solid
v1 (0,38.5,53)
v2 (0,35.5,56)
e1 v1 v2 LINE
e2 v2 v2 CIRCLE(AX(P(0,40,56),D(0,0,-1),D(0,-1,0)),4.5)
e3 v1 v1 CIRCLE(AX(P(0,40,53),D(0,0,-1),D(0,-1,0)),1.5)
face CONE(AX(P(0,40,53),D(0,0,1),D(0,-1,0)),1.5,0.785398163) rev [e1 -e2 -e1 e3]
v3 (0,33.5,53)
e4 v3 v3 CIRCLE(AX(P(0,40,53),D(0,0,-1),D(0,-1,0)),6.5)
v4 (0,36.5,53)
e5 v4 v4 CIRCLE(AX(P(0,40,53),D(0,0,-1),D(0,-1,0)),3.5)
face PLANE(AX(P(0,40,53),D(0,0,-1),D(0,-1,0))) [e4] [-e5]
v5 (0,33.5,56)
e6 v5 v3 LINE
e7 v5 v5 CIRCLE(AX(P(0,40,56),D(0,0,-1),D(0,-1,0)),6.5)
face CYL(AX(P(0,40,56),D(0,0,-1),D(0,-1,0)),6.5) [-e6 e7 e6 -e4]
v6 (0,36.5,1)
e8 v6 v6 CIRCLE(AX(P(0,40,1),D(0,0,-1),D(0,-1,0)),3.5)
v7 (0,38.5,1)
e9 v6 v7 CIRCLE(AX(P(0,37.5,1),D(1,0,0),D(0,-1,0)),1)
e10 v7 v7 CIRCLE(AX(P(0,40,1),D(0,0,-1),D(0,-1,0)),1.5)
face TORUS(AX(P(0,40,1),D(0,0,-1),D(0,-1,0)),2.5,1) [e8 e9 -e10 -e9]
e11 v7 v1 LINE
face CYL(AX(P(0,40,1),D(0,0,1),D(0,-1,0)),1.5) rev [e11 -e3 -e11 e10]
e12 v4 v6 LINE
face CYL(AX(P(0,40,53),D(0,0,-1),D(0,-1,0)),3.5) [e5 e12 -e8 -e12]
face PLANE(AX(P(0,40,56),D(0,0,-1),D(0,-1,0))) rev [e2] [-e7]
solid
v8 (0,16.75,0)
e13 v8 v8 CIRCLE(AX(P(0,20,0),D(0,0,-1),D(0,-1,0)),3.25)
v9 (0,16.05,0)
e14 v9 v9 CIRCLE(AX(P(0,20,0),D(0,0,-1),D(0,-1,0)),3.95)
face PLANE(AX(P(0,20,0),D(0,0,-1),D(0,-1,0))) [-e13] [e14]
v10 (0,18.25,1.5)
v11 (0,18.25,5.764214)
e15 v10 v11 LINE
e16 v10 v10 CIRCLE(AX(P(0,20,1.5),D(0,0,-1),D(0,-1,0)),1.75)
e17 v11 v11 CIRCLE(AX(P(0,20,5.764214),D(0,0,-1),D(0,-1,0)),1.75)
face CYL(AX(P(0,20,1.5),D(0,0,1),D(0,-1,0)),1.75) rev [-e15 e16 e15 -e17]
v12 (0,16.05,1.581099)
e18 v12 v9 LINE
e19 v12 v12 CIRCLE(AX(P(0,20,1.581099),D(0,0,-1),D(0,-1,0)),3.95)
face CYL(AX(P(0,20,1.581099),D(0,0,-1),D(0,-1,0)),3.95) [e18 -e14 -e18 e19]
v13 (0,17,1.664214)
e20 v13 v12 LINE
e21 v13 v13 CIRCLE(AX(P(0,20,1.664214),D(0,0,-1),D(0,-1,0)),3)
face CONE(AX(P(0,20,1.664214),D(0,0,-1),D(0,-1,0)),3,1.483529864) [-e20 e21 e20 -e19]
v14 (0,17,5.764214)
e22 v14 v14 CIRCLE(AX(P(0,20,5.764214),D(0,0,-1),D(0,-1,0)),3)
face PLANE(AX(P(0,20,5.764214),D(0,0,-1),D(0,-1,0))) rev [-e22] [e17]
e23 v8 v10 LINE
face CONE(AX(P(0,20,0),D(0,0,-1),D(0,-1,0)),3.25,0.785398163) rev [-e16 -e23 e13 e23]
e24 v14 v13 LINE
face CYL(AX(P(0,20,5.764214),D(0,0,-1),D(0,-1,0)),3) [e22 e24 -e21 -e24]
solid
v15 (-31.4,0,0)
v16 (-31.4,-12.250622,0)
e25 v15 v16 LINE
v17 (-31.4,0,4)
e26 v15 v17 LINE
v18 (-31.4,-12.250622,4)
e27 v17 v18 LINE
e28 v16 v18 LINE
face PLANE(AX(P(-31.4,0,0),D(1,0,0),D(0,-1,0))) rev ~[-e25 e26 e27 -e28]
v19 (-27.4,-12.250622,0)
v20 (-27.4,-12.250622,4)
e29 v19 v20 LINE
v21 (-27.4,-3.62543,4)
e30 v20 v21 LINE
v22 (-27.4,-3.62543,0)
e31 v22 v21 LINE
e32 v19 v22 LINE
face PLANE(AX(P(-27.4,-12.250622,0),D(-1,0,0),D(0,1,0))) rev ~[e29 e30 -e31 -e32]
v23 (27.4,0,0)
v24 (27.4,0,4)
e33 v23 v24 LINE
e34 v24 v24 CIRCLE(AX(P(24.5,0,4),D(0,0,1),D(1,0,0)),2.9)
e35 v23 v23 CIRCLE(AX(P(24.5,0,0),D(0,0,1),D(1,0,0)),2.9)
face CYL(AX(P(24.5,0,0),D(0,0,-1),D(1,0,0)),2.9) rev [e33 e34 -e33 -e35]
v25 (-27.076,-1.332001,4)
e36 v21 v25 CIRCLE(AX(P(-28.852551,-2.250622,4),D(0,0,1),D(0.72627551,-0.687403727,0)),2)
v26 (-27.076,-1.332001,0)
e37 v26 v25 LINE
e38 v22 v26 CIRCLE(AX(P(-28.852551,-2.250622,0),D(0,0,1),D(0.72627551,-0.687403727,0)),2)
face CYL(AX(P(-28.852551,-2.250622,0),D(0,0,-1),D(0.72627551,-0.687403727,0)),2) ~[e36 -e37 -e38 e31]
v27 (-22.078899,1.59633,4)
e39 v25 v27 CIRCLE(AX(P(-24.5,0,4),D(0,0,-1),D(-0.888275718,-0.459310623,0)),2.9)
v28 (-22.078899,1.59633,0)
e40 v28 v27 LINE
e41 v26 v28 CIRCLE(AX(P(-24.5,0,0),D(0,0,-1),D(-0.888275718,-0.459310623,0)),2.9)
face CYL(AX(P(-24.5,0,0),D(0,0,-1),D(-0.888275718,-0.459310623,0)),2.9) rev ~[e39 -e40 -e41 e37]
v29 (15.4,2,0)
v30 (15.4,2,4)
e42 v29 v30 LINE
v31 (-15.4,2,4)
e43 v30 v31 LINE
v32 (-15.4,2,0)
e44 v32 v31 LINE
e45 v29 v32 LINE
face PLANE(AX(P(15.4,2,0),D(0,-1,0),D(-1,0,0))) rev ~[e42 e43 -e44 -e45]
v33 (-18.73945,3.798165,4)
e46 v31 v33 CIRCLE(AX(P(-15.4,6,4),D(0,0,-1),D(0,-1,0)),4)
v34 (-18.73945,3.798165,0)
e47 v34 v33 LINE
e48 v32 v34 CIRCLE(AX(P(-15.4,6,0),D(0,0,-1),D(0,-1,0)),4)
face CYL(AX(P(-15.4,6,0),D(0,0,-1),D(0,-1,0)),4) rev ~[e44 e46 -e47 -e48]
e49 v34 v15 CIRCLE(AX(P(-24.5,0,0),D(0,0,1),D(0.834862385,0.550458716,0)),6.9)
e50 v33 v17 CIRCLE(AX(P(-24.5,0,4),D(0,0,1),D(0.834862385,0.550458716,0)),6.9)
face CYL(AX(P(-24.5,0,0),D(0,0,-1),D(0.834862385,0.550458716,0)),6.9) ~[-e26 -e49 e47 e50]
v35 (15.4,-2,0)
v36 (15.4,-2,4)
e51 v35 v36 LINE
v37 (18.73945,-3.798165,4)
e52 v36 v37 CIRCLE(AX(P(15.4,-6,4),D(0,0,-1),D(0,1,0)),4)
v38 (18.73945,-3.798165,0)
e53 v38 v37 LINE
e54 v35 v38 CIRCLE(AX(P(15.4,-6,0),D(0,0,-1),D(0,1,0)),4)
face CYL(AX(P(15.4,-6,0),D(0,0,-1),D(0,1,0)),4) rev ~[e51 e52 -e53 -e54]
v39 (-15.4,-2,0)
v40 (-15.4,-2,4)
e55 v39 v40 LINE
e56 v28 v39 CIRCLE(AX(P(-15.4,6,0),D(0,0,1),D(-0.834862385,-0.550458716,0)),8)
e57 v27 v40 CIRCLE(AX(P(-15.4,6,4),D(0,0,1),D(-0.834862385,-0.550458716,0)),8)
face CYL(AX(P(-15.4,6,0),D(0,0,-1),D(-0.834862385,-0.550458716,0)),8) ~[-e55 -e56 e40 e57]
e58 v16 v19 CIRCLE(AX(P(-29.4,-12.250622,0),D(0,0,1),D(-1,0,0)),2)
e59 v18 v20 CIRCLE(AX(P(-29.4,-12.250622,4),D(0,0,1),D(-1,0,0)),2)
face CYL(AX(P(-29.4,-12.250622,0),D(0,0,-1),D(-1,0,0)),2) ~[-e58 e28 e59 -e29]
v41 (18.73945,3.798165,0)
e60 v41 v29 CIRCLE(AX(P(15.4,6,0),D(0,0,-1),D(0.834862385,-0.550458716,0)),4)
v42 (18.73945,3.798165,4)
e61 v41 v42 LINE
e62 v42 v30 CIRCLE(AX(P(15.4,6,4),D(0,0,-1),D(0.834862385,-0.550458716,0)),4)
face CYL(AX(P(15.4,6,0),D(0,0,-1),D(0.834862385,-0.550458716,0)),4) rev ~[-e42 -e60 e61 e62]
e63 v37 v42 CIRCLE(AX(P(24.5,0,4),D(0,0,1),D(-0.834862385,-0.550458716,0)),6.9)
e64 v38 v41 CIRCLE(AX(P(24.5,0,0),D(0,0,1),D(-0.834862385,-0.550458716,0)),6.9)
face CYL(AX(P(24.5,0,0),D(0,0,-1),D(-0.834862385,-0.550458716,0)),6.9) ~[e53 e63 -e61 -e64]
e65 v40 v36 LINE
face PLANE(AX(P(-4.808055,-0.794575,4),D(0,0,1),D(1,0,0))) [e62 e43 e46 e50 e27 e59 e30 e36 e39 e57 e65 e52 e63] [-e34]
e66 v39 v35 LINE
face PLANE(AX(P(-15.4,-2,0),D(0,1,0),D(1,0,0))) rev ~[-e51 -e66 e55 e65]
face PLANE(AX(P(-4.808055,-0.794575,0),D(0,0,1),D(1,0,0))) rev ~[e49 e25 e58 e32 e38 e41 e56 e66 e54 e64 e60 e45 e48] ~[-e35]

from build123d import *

# Parameters (mm, degrees)
F1_R     = 2.9
F2_DEPTH = 4


# Not quite as in the source:
# - a feature names something its author has since deleted; it is built from what else it names


with BuildPart() as f2:
    # F1 (on Top) → F2 (new body)
    with BuildSketch(Plane.XY):
        with BuildLine():
            Line((15.4, 2), (-15.4, 2))
            ThreePointArc((-15.4, 2), (-17.2963992921, 2.4781156003), (-18.7394495413, 3.7981651376))
            ThreePointArc((-18.7394495413, 3.7981651376), (-26.4827004104, 6.609001368), (-31.4, 0))
            Line((-31.4, 0), (-31.4, -12.2506220506))
            ThreePointArc((-31.4, -12.2506220506), (-29.4, -14.2506220506), (-27.4, -12.2506220506))
            Line((-27.4, -12.2506220506), (-27.4, -3.6254295037))
            ThreePointArc((-27.4, -3.6254295037), (-26.8722153245, -2.5303907614), (-27.0759995835, -1.3320008055))
            ThreePointArc((-27.0759995835, -1.3320008055), (-25.9662125115, 2.5020433392), (-22.0788990826, 1.5963302752))
            ThreePointArc((-22.0788990826, 1.5963302752), (-19.1927985843, -1.0437687994), (-15.4, -2))
            Line((-15.4, -2), (15.4, -2))
            ThreePointArc((15.4, -2), (17.2963992921, -2.4781156003), (18.7394495413, -3.7981651376))
            ThreePointArc((18.7394495413, -3.7981651376), (31.4, 0), (18.7394495413, 3.7981651376))
            ThreePointArc((18.7394495413, 3.7981651376), (17.2963992921, 2.4781156003), (15.4, 2))
        make_face()
        with Locations((24.5, 0)):
            Circle(F1_R, mode=Mode.SUBTRACT)
    extrude(amount=F2_DEPTH)


with BuildPart() as f4:
    # F3 (on Right) → F4 (revolve)
    with BuildSketch(Plane.YZ):
        Polygon((16.05, 1.581099332), (16.05, 0), (16.75, 0), (18.25, 1.5), (18.25, 5.7642135624), (17, 5.7642135624), (17, 1.6642135624), align=None)
    revolve(axis=Axis((0, 20, 5.0162096566), (0, 0, -1)))


with BuildPart() as f5:
    # F3 (on Right) → F5 (revolve)
    with BuildSketch(Plane.YZ):
        with BuildLine():
            Line((36.5, 53), (36.5, 1))
            ThreePointArc((36.5, 1), (37.5, 0), (38.5, 1))
            Line((38.5, 1), (38.5, 53))
            Line((38.5, 53), (35.5, 56))
            Line((35.5, 56), (33.5, 56))
            Line((33.5, 56), (33.5, 53))
            Line((33.5, 53), (36.5, 53))
        make_face()
    revolve(axis=Axis((0, 40, 28.579190366), (0, 0, -1)))


solid = Compound([f2.part, f4.part, f5.part])
